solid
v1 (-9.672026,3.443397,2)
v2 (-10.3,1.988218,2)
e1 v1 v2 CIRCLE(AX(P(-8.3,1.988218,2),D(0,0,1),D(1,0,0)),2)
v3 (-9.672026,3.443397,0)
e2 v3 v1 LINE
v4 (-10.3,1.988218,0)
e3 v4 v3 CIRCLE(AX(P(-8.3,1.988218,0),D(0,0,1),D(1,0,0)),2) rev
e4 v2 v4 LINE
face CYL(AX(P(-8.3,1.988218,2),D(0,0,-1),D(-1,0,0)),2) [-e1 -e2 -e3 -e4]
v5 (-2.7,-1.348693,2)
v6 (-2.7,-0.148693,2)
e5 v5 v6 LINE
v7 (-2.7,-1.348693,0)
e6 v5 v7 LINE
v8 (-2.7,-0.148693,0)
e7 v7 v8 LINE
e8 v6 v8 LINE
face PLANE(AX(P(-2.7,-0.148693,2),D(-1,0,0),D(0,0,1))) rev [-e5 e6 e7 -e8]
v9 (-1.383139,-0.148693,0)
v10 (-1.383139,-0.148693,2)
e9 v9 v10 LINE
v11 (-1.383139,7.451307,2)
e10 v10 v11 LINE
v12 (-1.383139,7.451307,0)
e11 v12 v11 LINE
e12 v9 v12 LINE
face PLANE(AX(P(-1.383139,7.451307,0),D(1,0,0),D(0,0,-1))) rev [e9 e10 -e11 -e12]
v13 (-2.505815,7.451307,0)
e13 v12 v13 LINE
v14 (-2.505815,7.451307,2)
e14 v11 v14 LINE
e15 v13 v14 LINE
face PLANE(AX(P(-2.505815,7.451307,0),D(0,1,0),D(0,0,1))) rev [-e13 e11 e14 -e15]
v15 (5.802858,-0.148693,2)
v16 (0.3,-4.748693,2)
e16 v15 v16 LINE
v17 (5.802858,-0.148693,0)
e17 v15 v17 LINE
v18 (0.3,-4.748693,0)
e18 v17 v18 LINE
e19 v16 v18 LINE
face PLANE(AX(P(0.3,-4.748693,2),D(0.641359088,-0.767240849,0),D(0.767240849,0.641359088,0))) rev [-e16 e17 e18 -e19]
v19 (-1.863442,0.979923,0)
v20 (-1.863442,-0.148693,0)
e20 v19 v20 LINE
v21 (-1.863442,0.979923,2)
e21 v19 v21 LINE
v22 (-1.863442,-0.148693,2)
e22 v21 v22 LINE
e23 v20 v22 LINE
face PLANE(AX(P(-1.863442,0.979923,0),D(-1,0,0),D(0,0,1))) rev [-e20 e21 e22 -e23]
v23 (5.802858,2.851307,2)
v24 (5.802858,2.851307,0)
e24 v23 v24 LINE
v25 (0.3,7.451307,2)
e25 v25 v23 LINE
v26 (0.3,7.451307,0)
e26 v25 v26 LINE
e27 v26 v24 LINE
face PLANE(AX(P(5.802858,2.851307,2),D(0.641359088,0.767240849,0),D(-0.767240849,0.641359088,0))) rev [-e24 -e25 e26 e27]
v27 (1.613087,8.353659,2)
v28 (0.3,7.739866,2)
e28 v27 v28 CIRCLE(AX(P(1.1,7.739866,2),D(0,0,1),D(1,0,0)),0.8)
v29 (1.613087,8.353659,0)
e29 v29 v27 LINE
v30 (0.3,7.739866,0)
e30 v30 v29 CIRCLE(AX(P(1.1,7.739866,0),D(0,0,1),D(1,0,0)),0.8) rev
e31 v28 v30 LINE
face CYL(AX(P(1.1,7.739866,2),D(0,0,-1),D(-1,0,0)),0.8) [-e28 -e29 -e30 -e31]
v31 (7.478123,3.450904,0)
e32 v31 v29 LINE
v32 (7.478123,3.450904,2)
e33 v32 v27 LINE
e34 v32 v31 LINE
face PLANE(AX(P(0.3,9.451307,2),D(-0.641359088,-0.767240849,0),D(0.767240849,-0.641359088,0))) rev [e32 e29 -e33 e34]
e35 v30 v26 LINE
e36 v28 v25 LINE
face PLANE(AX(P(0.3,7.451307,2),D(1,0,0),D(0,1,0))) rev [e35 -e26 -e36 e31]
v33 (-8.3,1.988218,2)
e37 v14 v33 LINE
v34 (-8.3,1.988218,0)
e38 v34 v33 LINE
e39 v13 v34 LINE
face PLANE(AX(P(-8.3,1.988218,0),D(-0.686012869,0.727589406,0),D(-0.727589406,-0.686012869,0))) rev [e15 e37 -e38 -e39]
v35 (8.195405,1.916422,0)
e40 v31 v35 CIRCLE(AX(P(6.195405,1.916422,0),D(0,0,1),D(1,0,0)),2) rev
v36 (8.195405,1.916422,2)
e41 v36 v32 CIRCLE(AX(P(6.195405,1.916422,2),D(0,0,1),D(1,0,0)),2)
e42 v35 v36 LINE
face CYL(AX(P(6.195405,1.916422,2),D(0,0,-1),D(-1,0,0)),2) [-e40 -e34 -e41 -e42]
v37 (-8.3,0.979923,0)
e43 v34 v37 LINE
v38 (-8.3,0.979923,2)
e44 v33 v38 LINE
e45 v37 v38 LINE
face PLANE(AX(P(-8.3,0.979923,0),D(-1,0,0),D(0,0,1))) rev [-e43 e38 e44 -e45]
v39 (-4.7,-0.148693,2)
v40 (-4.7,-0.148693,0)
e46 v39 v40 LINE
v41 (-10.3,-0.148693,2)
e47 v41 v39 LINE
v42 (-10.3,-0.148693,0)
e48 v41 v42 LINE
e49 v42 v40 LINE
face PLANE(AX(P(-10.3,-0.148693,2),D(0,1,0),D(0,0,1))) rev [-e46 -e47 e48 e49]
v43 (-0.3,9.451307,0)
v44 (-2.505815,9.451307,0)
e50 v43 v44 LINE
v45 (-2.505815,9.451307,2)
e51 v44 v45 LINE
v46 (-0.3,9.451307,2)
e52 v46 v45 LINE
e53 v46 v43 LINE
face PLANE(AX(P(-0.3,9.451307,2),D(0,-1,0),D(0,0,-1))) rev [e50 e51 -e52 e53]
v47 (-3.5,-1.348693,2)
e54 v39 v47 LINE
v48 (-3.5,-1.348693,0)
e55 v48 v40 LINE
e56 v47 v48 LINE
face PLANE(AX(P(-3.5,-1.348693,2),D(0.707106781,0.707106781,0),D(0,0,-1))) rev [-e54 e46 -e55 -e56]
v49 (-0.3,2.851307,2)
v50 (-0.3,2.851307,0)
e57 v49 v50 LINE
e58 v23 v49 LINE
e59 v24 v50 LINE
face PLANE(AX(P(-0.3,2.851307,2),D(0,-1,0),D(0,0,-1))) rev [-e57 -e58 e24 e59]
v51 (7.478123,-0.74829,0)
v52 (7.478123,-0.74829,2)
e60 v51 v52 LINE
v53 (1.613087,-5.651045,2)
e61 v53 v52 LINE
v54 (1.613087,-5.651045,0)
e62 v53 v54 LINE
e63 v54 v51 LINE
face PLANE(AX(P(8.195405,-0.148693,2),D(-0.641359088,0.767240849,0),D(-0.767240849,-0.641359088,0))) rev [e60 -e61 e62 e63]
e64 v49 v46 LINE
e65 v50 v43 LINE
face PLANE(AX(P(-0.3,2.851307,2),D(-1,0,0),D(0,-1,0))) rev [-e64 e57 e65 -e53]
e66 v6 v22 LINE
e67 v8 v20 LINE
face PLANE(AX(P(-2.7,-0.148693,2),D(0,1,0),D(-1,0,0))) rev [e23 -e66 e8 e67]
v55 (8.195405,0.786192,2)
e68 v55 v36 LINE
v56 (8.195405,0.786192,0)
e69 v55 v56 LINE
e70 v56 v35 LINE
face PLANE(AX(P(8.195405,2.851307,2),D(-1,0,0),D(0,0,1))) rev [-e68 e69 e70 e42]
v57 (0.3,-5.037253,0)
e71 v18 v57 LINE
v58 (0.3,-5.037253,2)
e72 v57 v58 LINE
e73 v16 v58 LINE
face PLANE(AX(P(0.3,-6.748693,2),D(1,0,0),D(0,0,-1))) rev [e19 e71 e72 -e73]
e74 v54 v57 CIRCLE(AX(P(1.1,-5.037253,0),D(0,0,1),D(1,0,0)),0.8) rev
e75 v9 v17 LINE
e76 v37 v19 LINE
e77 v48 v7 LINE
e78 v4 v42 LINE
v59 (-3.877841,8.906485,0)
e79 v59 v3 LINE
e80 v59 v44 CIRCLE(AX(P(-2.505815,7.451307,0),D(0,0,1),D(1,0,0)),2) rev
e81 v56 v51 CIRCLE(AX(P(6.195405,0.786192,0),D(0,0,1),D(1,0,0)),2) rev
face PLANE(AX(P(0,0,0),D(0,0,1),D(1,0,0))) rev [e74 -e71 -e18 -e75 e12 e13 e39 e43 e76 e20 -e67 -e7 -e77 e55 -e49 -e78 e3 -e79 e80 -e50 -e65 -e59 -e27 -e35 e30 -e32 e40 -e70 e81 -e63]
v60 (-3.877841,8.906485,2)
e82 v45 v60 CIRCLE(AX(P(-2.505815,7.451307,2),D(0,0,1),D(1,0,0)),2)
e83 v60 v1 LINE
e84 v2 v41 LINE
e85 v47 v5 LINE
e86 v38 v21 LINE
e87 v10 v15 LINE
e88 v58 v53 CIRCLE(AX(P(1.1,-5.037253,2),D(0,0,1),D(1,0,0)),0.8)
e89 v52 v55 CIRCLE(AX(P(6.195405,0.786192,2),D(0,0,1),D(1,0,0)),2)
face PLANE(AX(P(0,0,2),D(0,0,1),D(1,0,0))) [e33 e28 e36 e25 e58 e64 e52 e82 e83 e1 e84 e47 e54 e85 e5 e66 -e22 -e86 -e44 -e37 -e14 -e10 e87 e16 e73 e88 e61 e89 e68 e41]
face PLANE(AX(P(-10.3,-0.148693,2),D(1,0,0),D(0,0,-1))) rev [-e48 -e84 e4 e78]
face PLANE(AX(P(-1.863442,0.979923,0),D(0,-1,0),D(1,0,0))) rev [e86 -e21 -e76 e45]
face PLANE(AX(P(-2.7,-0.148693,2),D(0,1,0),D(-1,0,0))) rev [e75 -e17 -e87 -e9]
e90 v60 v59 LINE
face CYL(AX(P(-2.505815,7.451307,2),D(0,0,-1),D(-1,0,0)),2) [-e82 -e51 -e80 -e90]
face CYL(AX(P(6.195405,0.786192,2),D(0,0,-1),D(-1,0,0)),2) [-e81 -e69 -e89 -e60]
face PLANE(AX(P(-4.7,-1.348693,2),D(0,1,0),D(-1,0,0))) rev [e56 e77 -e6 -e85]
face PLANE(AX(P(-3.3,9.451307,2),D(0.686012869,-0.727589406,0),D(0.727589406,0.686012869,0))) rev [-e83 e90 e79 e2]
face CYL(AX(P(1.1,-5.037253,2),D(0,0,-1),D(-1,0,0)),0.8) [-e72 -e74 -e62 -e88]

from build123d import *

# Parameters (mm, degrees)
BOSS_EXTRUDE1_DEPTH = 2
FILLET1_R           = 0.8
FILLET2_R           = 2
CUT_EXTRUDE1_DEPTH  = 15.121515427
CHAMFER1_SIZE       = 1.2


with BuildPart() as part:
    # Sketch1 → Boss-Extrude1 (new body)
    with BuildSketch(Plane.XY):
        Polygon((5.802857873, 2.85130668), (0.3, 7.45130668), (0.3, 9.45130668), (8.195404775, 2.85130668), (8.195404775, -0.14869332), (0.3, -6.74869332), (0.3, -4.74869332), (5.802857873, -0.14869332), (-2.7, -0.14869332), (-2.7, -1.34869332), (-4.7, -1.34869332), (-4.7, -0.14869332), (-10.3, -0.14869332), (-10.3, 2.85130668), (-3.3, 9.45130668), (-0.3, 9.45130668), (-0.3, 2.85130668), align=None)
    extrude(amount=BOSS_EXTRUDE1_DEPTH)

    # Fillet1
    fillet1_edges = [part.edges().sort_by_distance(p)[0] for p in [
        (0.3, 9.45130668, 1),
        (0.3, -6.74869332, 1),
    ]]
    fillet(fillet1_edges, radius=FILLET1_R)

    # Fillet2
    fillet2_edges = [part.edges().sort_by_distance(p)[0] for p in [
        (-10.3, 2.85130668, 1),
        (-3.3, 9.45130668, 1),
        (8.195404775, 2.85130668, 1),
        (8.195404775, -0.14869332, 1),
    ]]
    fillet(fillet2_edges, radius=FILLET2_R)

    # Sketch2 → Cut-Extrude1 (cut, through all)
    with BuildSketch(Plane.XY.offset(2)):
        Polygon((-1.383139325, 7.45130668), (-1.383139325, -0.14869332), (-1.863442011, -0.14869332), (-1.863442011, 0.979922786), (-8.3, 0.979922786), (-8.3, 1.988217887), (-2.505814916, 7.45130668), align=None)
    extrude(amount=-CUT_EXTRUDE1_DEPTH, mode=Mode.SUBTRACT)

    # Chamfer1
    chamfer1_edges = [part.edges().sort_by_distance(p)[0] for p in [
        (-4.7, -1.34869332, 1),
    ]]
    chamfer(chamfer1_edges, length=CHAMFER1_SIZE - 0.0001)  # a hair under: the kernel refuses the full size


solid = part.part
